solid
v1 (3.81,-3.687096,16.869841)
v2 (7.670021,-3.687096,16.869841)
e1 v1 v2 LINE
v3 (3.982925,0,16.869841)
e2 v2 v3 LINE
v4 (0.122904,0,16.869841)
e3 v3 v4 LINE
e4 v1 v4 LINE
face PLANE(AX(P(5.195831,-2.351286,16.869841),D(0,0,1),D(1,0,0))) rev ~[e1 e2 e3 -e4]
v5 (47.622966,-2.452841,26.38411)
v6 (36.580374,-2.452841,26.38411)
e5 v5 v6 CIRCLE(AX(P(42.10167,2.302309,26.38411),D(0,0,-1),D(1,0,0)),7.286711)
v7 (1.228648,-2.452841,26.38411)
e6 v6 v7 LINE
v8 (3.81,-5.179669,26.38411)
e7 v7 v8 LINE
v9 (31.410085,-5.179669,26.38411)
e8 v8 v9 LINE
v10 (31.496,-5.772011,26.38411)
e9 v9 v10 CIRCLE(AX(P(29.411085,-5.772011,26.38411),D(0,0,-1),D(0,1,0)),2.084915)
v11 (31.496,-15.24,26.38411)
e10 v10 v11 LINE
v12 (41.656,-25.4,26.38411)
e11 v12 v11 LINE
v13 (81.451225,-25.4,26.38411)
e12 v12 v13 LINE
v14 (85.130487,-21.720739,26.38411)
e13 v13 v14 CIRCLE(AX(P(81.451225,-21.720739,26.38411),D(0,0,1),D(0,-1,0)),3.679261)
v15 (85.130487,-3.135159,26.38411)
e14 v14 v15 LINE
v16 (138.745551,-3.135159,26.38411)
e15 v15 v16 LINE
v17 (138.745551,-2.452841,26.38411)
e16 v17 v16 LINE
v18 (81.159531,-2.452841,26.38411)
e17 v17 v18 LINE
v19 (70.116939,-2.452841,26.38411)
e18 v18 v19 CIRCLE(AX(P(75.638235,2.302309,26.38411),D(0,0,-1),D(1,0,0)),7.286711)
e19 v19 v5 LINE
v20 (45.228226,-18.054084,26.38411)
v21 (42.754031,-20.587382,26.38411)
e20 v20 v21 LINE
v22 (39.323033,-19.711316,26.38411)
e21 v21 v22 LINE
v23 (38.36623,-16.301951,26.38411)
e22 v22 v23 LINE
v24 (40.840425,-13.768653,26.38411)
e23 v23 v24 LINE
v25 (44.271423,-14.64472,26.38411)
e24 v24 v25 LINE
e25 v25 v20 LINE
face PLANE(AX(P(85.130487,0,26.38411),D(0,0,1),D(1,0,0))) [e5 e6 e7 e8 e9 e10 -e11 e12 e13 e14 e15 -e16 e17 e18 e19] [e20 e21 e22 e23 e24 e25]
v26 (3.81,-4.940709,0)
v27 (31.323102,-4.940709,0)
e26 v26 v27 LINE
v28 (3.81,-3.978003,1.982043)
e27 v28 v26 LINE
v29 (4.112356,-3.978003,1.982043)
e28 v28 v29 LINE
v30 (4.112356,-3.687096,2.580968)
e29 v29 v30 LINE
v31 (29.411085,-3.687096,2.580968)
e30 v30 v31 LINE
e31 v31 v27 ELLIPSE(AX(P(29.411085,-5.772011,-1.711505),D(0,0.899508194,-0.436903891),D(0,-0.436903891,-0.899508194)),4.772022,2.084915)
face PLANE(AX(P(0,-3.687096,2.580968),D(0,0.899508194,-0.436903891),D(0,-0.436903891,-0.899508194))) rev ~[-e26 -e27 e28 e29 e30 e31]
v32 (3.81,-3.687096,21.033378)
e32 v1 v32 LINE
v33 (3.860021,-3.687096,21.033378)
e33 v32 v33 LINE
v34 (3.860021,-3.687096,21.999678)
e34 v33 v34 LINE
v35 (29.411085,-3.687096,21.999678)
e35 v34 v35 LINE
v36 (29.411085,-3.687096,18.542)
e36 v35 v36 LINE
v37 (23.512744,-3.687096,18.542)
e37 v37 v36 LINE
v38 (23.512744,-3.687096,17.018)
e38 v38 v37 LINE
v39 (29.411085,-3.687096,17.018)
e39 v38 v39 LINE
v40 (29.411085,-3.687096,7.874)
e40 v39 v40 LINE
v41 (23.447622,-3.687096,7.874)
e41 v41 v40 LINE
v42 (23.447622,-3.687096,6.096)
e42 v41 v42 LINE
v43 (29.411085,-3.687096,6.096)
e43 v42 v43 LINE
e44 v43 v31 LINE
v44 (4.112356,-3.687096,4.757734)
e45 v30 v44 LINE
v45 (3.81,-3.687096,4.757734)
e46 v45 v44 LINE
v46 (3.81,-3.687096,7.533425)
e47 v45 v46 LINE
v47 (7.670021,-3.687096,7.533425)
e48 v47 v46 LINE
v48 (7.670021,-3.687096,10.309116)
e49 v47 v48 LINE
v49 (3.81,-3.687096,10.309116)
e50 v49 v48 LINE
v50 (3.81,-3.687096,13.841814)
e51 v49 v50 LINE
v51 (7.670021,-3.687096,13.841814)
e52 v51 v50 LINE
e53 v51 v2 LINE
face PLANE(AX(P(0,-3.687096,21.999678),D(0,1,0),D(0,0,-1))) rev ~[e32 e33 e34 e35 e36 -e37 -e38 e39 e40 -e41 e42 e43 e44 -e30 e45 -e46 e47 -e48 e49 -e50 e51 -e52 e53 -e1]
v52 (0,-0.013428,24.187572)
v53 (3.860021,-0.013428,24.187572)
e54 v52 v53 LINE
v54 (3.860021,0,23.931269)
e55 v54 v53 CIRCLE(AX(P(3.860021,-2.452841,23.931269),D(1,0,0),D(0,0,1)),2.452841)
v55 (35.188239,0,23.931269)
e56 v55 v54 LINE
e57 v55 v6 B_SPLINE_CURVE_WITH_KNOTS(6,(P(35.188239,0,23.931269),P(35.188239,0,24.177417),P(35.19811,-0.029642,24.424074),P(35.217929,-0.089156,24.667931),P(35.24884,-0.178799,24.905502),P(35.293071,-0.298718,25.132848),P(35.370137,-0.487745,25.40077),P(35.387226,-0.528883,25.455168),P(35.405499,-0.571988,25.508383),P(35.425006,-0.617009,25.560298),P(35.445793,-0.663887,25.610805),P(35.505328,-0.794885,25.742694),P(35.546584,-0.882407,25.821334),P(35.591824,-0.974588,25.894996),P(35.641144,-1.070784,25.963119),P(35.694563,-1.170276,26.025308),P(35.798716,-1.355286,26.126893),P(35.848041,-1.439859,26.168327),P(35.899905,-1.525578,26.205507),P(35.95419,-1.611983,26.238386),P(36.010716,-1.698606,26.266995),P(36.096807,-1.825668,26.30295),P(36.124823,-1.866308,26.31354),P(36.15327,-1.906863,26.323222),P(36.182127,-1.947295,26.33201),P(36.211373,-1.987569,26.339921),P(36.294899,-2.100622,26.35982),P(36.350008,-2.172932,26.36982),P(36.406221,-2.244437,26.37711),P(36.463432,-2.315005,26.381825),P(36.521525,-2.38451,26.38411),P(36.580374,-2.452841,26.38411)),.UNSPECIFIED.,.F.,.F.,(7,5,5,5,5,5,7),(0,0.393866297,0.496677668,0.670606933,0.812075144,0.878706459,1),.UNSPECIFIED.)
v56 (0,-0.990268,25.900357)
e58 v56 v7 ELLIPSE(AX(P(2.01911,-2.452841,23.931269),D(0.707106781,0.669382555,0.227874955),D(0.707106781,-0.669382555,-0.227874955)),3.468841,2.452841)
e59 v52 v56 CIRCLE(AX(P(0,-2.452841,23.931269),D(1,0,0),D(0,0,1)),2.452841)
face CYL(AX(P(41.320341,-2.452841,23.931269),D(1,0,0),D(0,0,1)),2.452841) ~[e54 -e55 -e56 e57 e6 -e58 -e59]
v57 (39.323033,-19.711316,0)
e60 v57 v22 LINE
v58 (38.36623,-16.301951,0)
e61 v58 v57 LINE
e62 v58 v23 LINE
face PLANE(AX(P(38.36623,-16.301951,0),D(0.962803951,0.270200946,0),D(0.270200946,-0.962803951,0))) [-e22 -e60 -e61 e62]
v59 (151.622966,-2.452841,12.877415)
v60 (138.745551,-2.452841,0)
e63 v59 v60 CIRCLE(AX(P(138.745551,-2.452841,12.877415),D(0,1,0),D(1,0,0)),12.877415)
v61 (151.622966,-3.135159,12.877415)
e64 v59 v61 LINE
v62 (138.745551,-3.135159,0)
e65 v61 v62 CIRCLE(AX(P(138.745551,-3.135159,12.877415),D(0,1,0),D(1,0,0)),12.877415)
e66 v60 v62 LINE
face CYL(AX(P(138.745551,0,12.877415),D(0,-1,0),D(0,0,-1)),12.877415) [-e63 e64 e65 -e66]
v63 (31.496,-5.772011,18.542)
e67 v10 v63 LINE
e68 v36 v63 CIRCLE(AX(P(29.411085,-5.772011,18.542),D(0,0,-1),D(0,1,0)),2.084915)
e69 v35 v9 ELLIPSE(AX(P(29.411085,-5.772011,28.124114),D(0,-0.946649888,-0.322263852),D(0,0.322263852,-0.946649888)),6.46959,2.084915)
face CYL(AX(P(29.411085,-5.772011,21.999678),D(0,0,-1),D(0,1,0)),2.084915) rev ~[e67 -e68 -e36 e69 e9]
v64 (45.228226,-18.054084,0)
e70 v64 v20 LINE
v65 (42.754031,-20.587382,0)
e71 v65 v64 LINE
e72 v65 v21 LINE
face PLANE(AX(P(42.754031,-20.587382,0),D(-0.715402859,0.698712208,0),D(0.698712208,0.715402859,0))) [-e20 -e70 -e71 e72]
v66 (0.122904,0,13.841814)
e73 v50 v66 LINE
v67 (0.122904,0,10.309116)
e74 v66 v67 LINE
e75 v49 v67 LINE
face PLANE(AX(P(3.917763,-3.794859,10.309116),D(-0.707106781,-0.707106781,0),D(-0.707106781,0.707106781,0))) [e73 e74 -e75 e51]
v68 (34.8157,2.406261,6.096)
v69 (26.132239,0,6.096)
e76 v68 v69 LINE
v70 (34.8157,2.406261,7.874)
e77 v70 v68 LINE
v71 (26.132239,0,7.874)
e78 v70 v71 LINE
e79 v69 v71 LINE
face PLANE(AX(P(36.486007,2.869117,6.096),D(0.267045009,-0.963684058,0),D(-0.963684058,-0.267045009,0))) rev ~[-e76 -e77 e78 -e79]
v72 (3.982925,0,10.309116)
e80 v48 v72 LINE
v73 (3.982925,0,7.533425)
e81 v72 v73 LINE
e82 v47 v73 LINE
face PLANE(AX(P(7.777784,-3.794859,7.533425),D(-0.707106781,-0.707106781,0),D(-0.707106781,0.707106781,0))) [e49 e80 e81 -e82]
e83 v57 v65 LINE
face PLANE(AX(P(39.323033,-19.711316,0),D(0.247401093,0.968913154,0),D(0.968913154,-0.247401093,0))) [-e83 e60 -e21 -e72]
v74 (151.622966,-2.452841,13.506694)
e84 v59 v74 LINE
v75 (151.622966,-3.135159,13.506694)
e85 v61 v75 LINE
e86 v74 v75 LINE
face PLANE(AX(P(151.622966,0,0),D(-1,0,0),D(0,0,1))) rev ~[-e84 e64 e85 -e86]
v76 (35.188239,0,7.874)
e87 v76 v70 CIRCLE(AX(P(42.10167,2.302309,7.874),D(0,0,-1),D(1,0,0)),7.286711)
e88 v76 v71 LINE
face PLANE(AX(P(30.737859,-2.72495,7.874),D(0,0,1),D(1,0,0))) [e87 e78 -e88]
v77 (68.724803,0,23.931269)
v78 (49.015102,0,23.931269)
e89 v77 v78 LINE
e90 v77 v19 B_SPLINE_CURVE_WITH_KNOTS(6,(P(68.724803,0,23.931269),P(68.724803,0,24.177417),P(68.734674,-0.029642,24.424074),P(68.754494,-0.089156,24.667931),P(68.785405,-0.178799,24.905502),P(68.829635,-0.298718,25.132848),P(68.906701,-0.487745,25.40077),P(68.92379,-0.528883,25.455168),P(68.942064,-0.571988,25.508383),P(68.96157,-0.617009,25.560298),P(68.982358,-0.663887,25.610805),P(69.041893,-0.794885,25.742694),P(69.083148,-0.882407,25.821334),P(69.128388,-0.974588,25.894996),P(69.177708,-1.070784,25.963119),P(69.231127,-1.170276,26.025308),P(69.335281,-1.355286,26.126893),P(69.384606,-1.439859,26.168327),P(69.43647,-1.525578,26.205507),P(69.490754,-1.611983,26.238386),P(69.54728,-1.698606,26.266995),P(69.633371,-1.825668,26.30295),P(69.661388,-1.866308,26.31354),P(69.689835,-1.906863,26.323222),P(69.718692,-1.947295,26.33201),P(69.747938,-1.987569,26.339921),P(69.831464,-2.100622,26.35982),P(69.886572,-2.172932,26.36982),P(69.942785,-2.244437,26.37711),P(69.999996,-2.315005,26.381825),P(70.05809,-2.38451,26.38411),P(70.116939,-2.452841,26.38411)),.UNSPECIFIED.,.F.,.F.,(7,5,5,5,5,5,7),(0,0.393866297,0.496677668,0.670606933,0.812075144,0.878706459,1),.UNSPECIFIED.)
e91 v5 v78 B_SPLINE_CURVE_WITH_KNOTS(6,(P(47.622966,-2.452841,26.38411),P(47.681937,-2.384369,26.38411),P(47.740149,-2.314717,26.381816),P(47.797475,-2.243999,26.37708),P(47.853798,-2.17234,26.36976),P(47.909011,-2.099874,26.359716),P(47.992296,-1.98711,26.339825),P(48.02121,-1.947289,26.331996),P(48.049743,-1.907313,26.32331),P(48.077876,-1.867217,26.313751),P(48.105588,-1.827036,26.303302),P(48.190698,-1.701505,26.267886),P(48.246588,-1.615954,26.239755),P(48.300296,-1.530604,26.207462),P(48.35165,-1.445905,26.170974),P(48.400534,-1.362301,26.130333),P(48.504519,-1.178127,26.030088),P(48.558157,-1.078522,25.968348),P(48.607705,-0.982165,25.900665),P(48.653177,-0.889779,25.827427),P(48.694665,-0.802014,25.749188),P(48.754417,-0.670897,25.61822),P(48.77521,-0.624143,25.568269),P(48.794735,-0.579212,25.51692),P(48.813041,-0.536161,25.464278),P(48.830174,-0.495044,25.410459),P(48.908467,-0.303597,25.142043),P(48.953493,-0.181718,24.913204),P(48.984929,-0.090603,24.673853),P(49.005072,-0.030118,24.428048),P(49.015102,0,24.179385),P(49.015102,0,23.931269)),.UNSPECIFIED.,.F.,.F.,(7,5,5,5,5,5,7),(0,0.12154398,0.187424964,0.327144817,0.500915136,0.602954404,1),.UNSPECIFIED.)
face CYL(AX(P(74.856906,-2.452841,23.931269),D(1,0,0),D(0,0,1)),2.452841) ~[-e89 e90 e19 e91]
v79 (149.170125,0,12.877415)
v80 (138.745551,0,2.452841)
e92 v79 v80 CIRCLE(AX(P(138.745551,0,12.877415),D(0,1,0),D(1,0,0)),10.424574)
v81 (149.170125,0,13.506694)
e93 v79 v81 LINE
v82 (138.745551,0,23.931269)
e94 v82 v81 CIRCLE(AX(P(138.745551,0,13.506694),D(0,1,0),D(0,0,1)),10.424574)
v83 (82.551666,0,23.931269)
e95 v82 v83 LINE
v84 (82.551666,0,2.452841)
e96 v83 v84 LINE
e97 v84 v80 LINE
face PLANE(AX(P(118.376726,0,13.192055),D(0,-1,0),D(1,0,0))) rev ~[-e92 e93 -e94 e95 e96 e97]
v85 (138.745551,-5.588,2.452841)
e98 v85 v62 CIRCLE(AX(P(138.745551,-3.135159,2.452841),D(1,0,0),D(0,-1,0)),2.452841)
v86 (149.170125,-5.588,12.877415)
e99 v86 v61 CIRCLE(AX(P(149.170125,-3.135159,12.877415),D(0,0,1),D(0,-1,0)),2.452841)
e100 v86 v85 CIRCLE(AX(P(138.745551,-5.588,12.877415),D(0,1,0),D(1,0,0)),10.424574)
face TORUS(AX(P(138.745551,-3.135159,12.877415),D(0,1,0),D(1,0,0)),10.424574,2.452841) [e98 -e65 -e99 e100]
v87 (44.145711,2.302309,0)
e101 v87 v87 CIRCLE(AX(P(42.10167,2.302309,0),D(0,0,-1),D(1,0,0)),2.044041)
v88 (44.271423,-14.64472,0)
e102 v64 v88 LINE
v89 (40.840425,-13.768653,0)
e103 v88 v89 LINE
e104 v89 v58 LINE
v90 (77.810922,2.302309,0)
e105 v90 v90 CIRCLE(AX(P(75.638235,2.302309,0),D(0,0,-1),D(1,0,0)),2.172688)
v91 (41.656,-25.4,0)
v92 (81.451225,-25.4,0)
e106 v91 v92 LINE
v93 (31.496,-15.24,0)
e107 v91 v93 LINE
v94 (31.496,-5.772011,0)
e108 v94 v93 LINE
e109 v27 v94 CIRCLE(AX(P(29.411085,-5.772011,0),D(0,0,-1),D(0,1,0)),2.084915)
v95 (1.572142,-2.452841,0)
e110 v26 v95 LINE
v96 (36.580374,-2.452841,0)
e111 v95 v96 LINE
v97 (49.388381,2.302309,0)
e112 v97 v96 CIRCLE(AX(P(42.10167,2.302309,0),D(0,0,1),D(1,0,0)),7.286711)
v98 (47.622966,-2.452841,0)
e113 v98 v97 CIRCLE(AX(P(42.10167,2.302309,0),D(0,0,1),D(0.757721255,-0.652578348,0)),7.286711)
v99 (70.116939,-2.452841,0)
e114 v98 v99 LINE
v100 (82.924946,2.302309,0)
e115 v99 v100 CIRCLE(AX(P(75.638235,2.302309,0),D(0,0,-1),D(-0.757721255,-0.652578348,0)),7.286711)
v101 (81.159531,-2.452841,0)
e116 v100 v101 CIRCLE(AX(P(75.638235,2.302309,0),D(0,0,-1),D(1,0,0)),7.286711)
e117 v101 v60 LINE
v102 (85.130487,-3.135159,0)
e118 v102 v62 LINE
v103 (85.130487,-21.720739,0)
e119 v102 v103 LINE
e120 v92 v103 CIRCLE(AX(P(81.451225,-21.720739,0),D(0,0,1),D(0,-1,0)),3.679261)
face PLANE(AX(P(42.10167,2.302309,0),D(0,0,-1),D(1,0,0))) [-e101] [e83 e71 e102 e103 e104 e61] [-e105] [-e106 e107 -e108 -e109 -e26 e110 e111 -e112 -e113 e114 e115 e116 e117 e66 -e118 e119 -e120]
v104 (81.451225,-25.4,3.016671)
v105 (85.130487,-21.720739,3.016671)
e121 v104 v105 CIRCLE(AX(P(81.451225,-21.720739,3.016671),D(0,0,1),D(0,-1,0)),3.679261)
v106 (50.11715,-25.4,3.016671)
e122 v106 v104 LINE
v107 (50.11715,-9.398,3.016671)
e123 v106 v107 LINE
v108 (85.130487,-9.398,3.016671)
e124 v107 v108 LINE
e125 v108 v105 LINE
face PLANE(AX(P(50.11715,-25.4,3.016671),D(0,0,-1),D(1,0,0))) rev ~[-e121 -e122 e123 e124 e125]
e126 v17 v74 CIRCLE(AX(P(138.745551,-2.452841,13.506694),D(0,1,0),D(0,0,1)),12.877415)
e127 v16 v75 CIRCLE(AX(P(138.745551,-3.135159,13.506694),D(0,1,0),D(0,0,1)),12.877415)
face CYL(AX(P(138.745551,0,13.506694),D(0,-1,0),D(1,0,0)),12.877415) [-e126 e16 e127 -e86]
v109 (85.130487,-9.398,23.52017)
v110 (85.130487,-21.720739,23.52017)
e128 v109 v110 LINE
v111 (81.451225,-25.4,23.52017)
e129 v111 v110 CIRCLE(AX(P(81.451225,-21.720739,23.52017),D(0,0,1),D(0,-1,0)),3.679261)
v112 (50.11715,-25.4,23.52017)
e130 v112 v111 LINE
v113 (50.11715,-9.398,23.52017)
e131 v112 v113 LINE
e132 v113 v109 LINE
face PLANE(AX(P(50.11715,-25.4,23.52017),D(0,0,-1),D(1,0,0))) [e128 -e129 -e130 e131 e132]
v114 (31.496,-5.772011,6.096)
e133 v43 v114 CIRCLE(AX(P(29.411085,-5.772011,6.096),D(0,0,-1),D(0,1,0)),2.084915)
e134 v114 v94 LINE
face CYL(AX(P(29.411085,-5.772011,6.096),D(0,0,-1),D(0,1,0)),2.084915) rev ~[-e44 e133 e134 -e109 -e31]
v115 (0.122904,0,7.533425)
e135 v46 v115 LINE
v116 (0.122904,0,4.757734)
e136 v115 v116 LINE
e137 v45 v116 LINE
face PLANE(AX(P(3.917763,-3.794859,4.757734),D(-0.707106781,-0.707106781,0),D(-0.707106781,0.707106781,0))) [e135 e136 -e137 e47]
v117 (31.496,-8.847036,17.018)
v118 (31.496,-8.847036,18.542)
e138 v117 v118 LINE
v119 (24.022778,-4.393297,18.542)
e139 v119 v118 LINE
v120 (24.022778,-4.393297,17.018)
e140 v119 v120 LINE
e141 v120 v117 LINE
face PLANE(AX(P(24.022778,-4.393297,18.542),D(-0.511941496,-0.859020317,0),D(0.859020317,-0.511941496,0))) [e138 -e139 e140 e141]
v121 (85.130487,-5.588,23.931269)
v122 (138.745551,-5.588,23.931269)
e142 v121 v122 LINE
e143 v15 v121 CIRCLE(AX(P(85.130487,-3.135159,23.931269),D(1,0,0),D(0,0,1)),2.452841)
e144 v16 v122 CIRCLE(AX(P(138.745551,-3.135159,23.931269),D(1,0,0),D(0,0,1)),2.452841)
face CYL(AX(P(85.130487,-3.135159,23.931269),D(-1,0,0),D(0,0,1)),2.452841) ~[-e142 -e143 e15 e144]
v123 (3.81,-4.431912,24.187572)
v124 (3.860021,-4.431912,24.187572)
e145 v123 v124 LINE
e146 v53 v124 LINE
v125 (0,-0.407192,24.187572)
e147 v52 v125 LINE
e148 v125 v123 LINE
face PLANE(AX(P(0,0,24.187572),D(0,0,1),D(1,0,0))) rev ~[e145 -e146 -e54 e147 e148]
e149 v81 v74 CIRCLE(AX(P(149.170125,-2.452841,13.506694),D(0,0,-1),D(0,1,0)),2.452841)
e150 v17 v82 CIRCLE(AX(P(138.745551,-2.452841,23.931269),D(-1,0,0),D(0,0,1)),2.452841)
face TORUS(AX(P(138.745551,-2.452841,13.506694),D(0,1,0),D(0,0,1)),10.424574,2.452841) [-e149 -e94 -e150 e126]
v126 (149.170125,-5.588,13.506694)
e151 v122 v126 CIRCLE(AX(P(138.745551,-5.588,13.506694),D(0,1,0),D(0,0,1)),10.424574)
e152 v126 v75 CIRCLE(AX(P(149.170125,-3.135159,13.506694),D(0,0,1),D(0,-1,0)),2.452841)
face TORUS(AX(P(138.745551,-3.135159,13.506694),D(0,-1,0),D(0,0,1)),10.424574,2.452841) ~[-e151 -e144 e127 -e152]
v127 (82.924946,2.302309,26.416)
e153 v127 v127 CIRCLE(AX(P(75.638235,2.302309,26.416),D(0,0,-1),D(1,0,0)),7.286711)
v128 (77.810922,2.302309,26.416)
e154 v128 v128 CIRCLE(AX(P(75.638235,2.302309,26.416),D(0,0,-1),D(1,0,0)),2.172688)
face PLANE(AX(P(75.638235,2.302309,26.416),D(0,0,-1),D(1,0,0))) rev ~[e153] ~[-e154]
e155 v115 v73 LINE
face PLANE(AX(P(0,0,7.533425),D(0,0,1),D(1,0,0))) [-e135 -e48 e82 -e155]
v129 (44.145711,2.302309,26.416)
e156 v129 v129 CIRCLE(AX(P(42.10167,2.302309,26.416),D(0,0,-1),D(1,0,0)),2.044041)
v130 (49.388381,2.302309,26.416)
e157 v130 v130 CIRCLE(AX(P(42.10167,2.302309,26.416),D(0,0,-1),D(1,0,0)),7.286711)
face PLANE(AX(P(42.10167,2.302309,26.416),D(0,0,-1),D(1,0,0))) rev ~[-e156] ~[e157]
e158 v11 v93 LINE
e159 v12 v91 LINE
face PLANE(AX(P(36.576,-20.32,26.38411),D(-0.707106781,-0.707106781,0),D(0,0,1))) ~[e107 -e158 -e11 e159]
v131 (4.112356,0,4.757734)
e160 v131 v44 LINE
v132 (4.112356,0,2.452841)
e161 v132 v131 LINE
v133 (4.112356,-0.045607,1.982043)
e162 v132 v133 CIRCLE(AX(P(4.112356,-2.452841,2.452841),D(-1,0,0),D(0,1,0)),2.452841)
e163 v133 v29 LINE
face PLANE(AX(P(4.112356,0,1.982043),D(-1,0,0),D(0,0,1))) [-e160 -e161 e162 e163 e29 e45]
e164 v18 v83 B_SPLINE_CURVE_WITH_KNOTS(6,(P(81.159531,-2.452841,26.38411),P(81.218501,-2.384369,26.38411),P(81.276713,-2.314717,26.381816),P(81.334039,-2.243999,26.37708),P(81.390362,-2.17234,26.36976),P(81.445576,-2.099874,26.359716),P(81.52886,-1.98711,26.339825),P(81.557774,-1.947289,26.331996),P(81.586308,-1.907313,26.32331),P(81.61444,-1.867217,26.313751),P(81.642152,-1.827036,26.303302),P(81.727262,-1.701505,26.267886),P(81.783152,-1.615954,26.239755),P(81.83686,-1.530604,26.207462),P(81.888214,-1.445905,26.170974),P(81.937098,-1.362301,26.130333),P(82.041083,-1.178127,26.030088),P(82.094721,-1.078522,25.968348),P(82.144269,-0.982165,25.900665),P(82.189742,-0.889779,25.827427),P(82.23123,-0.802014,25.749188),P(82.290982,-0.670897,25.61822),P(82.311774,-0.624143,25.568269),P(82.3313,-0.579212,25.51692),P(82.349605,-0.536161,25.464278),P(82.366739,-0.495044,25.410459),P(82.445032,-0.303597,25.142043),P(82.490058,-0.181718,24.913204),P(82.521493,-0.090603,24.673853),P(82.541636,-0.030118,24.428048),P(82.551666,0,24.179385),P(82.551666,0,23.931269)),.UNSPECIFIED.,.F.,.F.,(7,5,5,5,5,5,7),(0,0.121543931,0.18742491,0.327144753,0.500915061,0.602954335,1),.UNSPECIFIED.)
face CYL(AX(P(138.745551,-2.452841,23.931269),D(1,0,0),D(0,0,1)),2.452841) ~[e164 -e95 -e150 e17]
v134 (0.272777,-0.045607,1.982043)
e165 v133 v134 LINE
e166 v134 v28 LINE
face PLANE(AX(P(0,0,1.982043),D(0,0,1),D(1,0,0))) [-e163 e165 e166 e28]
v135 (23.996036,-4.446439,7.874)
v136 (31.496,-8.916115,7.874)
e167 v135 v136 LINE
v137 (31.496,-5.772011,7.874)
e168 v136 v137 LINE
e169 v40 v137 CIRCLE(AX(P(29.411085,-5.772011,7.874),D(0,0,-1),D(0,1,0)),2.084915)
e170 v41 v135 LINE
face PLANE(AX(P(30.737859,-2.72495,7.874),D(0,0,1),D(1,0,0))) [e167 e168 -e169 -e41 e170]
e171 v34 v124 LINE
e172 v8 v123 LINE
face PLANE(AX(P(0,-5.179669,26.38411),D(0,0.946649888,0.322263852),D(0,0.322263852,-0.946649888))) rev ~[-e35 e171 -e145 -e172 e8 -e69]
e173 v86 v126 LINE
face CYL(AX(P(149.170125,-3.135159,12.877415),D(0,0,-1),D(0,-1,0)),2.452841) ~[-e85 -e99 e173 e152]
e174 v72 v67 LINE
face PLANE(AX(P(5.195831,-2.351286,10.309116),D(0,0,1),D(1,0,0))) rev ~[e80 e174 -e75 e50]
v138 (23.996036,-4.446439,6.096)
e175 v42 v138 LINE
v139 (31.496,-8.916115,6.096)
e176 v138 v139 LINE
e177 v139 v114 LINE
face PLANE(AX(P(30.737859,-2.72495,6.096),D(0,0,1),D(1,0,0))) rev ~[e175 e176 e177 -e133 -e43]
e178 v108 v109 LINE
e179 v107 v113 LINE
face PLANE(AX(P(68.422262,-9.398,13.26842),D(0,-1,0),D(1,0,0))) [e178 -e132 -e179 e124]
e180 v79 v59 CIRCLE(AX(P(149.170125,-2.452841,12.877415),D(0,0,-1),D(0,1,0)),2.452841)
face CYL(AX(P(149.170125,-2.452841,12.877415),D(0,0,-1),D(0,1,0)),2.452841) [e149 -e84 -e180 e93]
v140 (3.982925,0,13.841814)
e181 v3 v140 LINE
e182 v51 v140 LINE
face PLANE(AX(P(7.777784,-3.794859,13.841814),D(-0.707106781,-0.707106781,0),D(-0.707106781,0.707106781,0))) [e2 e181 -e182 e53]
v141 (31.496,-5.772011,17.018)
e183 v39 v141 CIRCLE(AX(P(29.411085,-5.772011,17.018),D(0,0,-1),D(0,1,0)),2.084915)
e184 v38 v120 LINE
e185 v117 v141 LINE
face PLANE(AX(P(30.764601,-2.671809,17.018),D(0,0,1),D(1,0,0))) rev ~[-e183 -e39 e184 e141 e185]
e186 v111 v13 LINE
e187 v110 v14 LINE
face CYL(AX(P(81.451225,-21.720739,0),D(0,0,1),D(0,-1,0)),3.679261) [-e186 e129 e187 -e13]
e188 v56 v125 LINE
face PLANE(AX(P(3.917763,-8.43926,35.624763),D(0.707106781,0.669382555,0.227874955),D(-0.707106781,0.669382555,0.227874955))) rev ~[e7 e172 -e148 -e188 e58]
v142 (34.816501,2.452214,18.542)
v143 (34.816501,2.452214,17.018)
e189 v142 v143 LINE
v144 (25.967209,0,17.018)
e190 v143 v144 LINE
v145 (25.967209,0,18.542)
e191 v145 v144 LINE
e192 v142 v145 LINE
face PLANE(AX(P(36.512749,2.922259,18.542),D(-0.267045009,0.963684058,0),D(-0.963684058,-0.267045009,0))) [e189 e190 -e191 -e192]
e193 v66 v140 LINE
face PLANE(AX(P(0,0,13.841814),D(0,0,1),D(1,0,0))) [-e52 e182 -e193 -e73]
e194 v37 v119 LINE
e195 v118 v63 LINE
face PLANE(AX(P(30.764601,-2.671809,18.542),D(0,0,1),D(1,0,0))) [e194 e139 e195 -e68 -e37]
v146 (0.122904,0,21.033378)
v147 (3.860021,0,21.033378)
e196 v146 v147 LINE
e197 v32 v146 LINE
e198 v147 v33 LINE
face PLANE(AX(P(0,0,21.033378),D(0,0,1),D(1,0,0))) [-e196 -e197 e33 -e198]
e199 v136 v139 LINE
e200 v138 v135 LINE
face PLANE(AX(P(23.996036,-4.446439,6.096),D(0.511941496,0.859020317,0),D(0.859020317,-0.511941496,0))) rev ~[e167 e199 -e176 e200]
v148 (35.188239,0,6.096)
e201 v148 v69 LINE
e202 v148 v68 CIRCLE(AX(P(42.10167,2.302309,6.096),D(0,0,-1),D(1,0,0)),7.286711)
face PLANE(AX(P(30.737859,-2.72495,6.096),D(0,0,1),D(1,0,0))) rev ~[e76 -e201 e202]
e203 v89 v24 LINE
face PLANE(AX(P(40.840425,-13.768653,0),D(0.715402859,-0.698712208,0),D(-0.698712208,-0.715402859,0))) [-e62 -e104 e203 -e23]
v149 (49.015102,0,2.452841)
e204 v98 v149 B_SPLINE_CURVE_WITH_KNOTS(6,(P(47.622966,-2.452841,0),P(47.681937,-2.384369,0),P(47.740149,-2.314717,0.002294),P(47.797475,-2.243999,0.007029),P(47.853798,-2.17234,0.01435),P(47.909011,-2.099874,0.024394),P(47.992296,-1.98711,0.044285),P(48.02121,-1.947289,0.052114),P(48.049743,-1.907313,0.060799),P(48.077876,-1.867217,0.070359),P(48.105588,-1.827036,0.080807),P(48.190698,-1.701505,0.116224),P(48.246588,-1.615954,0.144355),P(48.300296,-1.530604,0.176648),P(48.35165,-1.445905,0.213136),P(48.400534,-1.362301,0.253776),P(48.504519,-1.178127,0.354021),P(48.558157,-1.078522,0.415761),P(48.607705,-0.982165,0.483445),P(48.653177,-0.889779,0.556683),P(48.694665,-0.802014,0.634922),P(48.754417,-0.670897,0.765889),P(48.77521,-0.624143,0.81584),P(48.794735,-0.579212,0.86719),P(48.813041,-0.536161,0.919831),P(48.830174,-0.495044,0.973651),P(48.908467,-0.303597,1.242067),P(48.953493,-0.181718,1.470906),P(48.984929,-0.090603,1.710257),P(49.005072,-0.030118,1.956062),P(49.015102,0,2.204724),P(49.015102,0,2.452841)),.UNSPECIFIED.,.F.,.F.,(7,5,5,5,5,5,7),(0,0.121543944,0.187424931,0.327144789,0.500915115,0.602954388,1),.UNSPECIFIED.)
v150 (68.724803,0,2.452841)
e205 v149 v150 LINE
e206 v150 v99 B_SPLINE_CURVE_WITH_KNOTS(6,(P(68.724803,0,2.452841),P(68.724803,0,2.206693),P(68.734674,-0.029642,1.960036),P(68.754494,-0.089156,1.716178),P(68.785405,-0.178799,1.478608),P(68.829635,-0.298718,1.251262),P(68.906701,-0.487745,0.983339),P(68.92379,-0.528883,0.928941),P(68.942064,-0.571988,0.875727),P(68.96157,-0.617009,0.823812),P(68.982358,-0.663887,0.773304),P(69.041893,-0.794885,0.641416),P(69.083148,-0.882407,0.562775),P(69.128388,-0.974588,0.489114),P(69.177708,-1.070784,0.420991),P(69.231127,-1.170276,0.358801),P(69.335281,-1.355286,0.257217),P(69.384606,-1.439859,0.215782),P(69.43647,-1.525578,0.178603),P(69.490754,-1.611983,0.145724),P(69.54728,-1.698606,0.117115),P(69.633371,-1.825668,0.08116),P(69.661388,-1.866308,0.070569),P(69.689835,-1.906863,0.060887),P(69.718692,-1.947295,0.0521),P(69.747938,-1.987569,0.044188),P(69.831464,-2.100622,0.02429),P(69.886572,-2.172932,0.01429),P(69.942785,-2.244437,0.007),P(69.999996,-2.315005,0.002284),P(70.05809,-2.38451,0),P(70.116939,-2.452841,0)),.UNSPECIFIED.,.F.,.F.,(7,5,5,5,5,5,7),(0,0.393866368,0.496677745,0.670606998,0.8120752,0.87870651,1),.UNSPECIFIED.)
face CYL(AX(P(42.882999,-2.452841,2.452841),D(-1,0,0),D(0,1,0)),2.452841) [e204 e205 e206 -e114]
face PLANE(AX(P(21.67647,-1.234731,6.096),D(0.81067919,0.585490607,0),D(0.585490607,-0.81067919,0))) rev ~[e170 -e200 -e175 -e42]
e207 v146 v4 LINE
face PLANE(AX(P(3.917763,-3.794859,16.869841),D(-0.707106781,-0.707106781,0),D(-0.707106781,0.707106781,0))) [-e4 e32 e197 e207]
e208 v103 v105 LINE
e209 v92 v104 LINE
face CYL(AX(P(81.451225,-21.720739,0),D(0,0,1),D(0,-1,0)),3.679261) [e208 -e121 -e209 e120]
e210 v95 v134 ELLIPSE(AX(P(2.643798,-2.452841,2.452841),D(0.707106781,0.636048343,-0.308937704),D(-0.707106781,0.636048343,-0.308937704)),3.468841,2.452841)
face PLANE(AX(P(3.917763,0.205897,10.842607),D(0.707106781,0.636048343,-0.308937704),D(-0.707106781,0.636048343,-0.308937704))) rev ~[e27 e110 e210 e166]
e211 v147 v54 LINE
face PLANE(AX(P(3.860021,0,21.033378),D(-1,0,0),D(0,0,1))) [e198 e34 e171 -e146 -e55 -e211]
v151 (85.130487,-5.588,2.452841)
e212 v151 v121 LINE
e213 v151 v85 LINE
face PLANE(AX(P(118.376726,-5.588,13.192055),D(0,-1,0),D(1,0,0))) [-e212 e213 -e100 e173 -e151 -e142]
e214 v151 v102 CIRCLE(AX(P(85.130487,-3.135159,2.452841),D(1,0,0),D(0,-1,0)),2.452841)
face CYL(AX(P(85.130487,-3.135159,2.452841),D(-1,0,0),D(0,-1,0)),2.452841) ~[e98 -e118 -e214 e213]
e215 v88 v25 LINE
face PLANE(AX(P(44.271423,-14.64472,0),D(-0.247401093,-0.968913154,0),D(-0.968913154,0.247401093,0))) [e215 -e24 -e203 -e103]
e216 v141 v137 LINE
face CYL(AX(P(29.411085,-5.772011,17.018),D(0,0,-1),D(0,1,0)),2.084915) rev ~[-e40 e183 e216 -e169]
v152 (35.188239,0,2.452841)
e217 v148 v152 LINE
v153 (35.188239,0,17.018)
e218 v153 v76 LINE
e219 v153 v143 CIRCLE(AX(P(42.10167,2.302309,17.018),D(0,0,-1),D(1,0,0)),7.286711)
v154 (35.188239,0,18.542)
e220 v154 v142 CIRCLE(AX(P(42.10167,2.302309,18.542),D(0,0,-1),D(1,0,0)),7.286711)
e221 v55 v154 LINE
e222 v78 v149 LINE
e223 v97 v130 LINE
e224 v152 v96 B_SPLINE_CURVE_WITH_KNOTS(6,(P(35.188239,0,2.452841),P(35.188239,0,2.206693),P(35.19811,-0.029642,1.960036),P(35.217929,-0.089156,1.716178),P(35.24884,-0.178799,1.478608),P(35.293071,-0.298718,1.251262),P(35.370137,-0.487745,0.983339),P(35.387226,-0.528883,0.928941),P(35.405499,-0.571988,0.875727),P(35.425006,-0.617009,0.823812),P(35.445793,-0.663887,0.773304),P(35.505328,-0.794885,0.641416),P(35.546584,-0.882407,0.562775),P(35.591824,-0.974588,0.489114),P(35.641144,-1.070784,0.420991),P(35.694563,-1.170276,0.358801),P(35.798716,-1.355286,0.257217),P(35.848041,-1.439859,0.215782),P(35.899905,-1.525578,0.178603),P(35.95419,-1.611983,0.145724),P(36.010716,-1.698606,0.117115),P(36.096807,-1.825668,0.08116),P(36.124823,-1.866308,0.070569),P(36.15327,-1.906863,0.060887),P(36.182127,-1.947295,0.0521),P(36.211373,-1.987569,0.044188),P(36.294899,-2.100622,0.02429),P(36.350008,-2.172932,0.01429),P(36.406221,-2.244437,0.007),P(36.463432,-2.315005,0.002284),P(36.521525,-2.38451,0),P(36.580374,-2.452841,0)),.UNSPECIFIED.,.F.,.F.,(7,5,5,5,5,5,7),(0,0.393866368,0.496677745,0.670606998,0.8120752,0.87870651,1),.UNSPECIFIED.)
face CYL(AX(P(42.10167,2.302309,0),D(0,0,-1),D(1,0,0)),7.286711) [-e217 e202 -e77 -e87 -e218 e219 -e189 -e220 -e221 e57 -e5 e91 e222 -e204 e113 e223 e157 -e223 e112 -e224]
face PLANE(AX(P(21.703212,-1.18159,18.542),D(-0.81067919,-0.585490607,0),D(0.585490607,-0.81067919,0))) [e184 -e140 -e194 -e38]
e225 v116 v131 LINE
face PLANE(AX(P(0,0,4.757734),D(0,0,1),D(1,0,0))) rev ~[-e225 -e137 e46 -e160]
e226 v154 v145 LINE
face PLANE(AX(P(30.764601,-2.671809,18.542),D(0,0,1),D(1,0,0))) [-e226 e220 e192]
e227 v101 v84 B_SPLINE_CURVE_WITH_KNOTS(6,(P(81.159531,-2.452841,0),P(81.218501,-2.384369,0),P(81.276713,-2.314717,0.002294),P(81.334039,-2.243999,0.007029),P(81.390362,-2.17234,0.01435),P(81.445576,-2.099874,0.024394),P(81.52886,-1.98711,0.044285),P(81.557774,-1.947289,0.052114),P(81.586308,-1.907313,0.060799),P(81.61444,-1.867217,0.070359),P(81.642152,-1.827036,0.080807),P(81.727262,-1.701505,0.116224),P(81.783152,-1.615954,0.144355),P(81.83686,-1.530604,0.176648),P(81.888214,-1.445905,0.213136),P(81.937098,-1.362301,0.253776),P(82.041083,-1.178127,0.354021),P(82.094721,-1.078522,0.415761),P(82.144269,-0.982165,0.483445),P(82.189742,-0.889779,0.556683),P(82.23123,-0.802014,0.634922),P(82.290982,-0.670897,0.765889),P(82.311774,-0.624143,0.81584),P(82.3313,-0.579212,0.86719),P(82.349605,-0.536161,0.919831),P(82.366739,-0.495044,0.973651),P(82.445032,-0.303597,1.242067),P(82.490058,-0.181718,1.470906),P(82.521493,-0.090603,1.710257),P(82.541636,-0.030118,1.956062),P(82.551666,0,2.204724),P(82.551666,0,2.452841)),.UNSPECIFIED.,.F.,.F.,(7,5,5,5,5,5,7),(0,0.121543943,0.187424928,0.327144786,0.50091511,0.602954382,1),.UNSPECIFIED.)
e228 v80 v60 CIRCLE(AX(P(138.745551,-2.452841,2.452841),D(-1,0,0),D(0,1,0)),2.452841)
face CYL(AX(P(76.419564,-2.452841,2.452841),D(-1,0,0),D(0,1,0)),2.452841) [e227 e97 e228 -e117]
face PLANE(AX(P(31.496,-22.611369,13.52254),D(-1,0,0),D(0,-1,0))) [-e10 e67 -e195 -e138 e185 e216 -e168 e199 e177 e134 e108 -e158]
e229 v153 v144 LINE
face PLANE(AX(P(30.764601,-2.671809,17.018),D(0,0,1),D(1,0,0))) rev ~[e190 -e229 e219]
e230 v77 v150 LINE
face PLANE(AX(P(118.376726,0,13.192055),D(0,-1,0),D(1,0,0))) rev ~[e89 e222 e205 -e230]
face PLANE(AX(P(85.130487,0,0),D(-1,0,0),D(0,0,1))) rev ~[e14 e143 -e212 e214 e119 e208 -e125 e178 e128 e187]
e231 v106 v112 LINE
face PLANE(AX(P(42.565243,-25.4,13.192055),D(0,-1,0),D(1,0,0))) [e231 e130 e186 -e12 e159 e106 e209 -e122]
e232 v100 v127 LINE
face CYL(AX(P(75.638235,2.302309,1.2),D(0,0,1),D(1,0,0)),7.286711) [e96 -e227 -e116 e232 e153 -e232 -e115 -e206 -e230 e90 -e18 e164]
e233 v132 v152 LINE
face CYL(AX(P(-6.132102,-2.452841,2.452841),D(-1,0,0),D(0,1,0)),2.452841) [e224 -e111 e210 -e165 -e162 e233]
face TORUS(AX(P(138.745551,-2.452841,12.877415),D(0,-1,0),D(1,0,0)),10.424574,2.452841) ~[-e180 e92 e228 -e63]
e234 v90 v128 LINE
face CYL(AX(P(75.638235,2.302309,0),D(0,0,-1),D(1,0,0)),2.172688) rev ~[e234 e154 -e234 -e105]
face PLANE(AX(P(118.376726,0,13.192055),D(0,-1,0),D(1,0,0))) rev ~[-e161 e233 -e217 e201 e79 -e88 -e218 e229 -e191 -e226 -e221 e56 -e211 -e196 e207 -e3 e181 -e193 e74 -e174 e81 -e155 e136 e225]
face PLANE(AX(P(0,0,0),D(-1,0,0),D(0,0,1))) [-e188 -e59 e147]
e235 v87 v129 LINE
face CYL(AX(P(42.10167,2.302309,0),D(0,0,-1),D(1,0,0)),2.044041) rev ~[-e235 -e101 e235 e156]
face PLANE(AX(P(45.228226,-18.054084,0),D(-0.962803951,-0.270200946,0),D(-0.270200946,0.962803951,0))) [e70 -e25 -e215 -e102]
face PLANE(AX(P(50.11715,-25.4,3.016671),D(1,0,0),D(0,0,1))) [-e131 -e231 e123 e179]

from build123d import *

# Parameters (mm, degrees)
F0_W          = 85.1304866374
F0_H          = 26.3841096312
F1_DEPTH      = 25.4
F0_W_2        = 66.4924792945
F2_DEPTH      = 5.588
F4_DEPTH      = 31.496
F5_W          = 3.8600212429
F5_H          = 3.1541939825
F5_H_2        = 3.028026782
F5_H_3        = 2.775690984
F5_W_2        = 4.1123558767
F6_DEPTH      = 25.4
F8_DEPTH      = 28.702
F9_SIZE       = 10.16
F10_R         = 3.6792614691
F11_T1_DEPTH  = 4.1635371745
F11_T3_DEPTH  = 3.532698378
F11_T5_DEPTH  = 2.7756914496
F11_T7_DEPTH  = 3.028026782
F11_T9_DEPTH  = 2.775690984
F11_T14_DEPTH = 21.9165514071
F11_T20_DEPTH = 21.7996979777
F12_R         = 12.8774151417
F13_W         = 36.6102233529
F13_H         = 20.5034988467
F14_DEPTH     = 16.002
F15_R         = 7.2867112822
F15_R_2       = 2.0440412519
F15_R_3       = 2.1726876713
F16_DEPTH     = 26.416
F17_T1_DEPTH  = 53.6150641528
F17_T3_DEPTH  = 0.6292793478
F17_T8_DEPTH  = 62.3259871722
F17_S9_R      = 7.2867112822
F17_T10_DEPTH = 33
F17_T14_DEPTH = 31.9739065533
F17_S15_R     = 7.2867112822
F17_T16_DEPTH = 18
F17_S17_R     = 7.2867112822
F17_T18_DEPTH = 18
F17_T22_DEPTH = 47.4524435023
F17_S23_R     = 7.2867112822
F17_T24_DEPTH = 25
F17_T28_DEPTH = 31.9739065533
F17_S29_R     = 7.2867112822
F17_T30_DEPTH = 18
F17_S31_R     = 7.2867112822
F17_T32_DEPTH = 18
F17_T36_DEPTH = 47.4524435023
F17_S37_R     = 7.2867112822
F17_T38_DEPTH = 25
F17_T42_DEPTH = 62.3259871722
F17_S43_R     = 7.2867112822
F17_T44_DEPTH = 33
F17_T46_ANGLE = 90
F17_T48_ANGLE = 90
F17_T50_ANGLE = 90
F17_T52_ANGLE = 90
F21_DEPTH     = 1.778
F23_DEPTH     = 1.524
F24_R         = 2.0849148325


# Not quite as in the source:
# - a fillet or chamfer that OpenCascade refuses, or shapes differently, is made with other operations: its cross-section is extruded or revolved along the edge and cut away or added


with BuildPart() as f1:
    # F0 (on Front) → F1 (new body)
    with BuildSketch(Plane.XZ):
        with Locations((42.5652433187, 13.1920548156)):
            Rectangle(F0_W, F0_H)
    extrude(amount=F1_DEPTH)

    # F0 (on Front) → F2 (join)
    with BuildSketch(Plane.XZ):
        with Locations((118.3767262846, 13.1920548156)):
            Rectangle(F0_W_2, F0_H)
    extrude(amount=F2_DEPTH)

    # F3 (on face) → F4 (cut)
    with BuildSketch(Plane(origin=(0, 0, 0), x_dir=(0, -1, 0), z_dir=(-1, 0, 0))):
        Polygon((35.6419347227, 33.0609679222), (7.6199998148, 33.5525795817), (5.1796691639, 26.3841096312), (25.4, 26.3841096312), (25.4, 0), (4.9407089369, 0), (7.8658051789, -6.022258196), (35.6419347227, -6.022258196), align=None)
        Polygon((25.4, 26.3841096312), (5.1796691639, 26.3841096312), (3.687096294, 21.9996776432), (3.687096294, 2.5809677318), (4.9407089369, 0), (25.4, 0), align=None)
    extrude(amount=-F4_DEPTH, mode=Mode.SUBTRACT)

    # F5 (on Front) → F6 (cut)
    with BuildSketch(Plane.XZ):
        with Locations((1.9300106214, 22.6104753092)):
            Rectangle(F5_W, F5_H)
        with Locations((1.9300106214, 15.3558277525)):
            Rectangle(F5_W, F5_H_2)
        with Locations((1.9300106214, 8.9212704916)):
            Rectangle(F5_W, F5_H_3)
        with Locations((2.0561779384, 3.3698880579)):
            Rectangle(F5_W_2, F5_H_3)
    extrude(amount=F6_DEPTH, mode=Mode.SUBTRACT)

    # F7 (on Top) → F8 (cut)
    with BuildSketch(Plane.XY):
        Polygon((40.8404252998, -13.7686529255), (38.3662302699, -16.301950867), (39.3230331276, -19.7113155876), (42.7540310152, -20.5873823667), (45.2282260452, -18.0540844252), (44.2714231875, -14.6447197046), align=None)
    extrude(amount=F8_DEPTH, mode=Mode.SUBTRACT)

    # F9
    f9_edges = [f1.edges().sort_by_distance(p)[0] for p in [
        (31.496, -25.4, 13.192055),
    ]]
    chamfer(f9_edges, length=F9_SIZE)

    # F10
    f10_edges = [f1.edges().sort_by_distance(p)[0] for p in [
        (85.130487, -25.4, 13.192055),
    ]]
    fillet(f10_edges, radius=F10_R)

    # F11: chamfer of 3.81 on 7 edges, made by hand

    # F11_s2 → F11_t1 (cut)
    with BuildSketch(Plane.XY.offset(16.8698411435)):
        with BuildLine():
            Line((3.9177630735, -3.7948593675), (-0.1077630735, 0.2306667794))
            Line((-0.1077630735, 0.2306667794), (-0.1839630735, 0.2306667794))
            ThreePointArc((-0.1839630735, 0.2306667794), (-0.0762, -1.7282147573), (-0.0762, -3.687096294))
            Line((-0.0762, -3.687096294), (0, -3.763296294))
            ThreePointArc((0, -3.763296294), (1.9588815367, -3.763296294), (3.9177630735, -3.8710593675))
            Line((3.9177630735, -3.8710593675), (3.9177630735, -3.7948593675))
        make_face()
    extrude(amount=F11_T1_DEPTH, mode=Mode.SUBTRACT)

    # F11_s4 → F11_t3 (cut)
    with BuildSketch(Plane.XY.offset(10.3091159835)):
        with BuildLine():
            Line((3.9177630735, -3.7948593675), (-0.1077630735, 0.2306667794))
            Line((-0.1077630735, 0.2306667794), (-0.1839630735, 0.2306667794))
            ThreePointArc((-0.1839630735, 0.2306667794), (-0.0762, -1.7282147573), (-0.0762, -3.687096294))
            Line((-0.0762, -3.687096294), (0, -3.763296294))
            ThreePointArc((0, -3.763296294), (1.9588815367, -3.763296294), (3.9177630735, -3.8710593675))
            Line((3.9177630735, -3.8710593675), (3.9177630735, -3.7948593675))
        make_face()
    extrude(amount=F11_T3_DEPTH, mode=Mode.SUBTRACT)

    # F11_s6 → F11_t5 (cut)
    with BuildSketch(Plane.XY.offset(4.7577335499)):
        with BuildLine():
            Line((3.9177630735, -3.7948593675), (-0.1077630735, 0.2306667794))
            Line((-0.1077630735, 0.2306667794), (-0.1839630735, 0.2306667794))
            ThreePointArc((-0.1839630735, 0.2306667794), (-0.0762, -1.7282147573), (-0.0762, -3.687096294))
            Line((-0.0762, -3.687096294), (0, -3.763296294))
            ThreePointArc((0, -3.763296294), (1.9588815367, -3.763296294), (3.9177630735, -3.8710593675))
            Line((3.9177630735, -3.8710593675), (3.9177630735, -3.7948593675))
        make_face()
    extrude(amount=F11_T5_DEPTH, mode=Mode.SUBTRACT)

    # F11_s8 → F11_t7 (cut)
    with BuildSketch(Plane.XY.offset(13.8418143615)):
        with BuildLine():
            Line((7.7777843163, -3.7948593675), (3.7522581694, 0.2306667794))
            Line((3.7522581694, 0.2306667794), (3.6760581694, 0.2306667794))
            ThreePointArc((3.6760581694, 0.2306667794), (3.7838212429, -1.7282147573), (3.7838212429, -3.687096294))
            Line((3.7838212429, -3.687096294), (3.8600212429, -3.763296294))
            ThreePointArc((3.8600212429, -3.763296294), (5.8189027796, -3.763296294), (7.7777843163, -3.8710593675))
            Line((7.7777843163, -3.8710593675), (7.7777843163, -3.7948593675))
        make_face()
    extrude(amount=F11_T7_DEPTH, mode=Mode.SUBTRACT)

    # F11_s10 → F11_t9 (cut)
    with BuildSketch(Plane.XY.offset(7.5334249996)):
        with BuildLine():
            Line((7.7777843163, -3.7948593675), (3.7522581694, 0.2306667794))
            Line((3.7522581694, 0.2306667794), (3.6760581694, 0.2306667794))
            ThreePointArc((3.6760581694, 0.2306667794), (3.7838212429, -1.7282147573), (3.7838212429, -3.687096294))
            Line((3.7838212429, -3.687096294), (3.8600212429, -3.763296294))
            ThreePointArc((3.8600212429, -3.763296294), (5.8189027796, -3.763296294), (7.7777843163, -3.8710593675))
            Line((7.7777843163, -3.8710593675), (7.7777843163, -3.7948593675))
        make_face()
    extrude(amount=F11_T9_DEPTH, mode=Mode.SUBTRACT)


with BuildPart() as f11_tool12:
    # F11_s13 → F11_t14 (new body)
    with BuildSketch(Plane(origin=(0, -11.7445344188, 34.4995634238), x_dir=(1, 0, 0), z_dir=(0, 0.3222638516, -0.9466498877))):
        with BuildLine():
            Line((3.9177630735, -3.491548486), (-0.1077630735, -7.5170746329))
            Line((-0.1077630735, -7.5170746329), (-0.1839630735, -7.5170746329))
            ThreePointArc((-0.1839630735, -7.5170746329), (-0.0762, -5.5581930961), (-0.0762, -3.5993115594))
            Line((-0.0762, -3.5993115594), (0, -3.5231115594))
            ThreePointArc((0, -3.5231115594), (1.9588815367, -3.5231115594), (3.9177630735, -3.415348486))
            Line((3.9177630735, -3.415348486), (3.9177630735, -3.491548486))
        make_face()
    extrude(amount=F11_T14_DEPTH)

    split(bisect_by=Plane.XY.offset(26.3841096312), keep=Keep.BOTTOM)

    split(bisect_by=Plane.XY.offset(24.1875723004), keep=Keep.TOP)


with BuildPart() as f1_1:
    add(f1.part)

    # F11_t11: cut F11_tool12
    add(f11_tool12.part, mode=Mode.SUBTRACT)


with BuildPart() as f11_tool18:
    # F11_s19 → F11_t20 (new body)
    with BuildSketch(Plane(origin=(0, 4.3004322544, 8.8538329162), x_dir=(1, 0, 0), z_dir=(0, -0.4369038907, -0.8995081936))):
        with BuildLine():
            Line((3.9177630735, 4.5519712442), (-0.1077630735, 0.5264450973))
            Line((-0.1077630735, 0.5264450973), (-0.1839630735, 0.5264450973))
            ThreePointArc((-0.1839630735, 0.5264450973), (-0.0762, 2.485326634), (-0.0762, 4.4442081707))
            Line((-0.0762, 4.4442081707), (0, 4.5204081707))
            ThreePointArc((0, 4.5204081707), (1.9588815367, 4.5204081707), (3.9177630735, 4.6281712442))
            Line((3.9177630735, 4.6281712442), (3.9177630735, 4.5519712442))
        make_face()
    extrude(amount=F11_T20_DEPTH)

    split(bisect_by=Plane.XY.offset(1.9820425659), keep=Keep.BOTTOM)


with BuildPart() as f1_2:
    add(f1_1.part)

    # F11_t17: cut F11_tool18
    add(f11_tool18.part, mode=Mode.SUBTRACT)

    # F12
    f12_edges = [f1_2.edges().sort_by_distance(p)[0] for p in [
        (151.622966, -2.794, 0),
        (151.622966, -2.794, 26.38411),
    ]]
    fillet(f12_edges, radius=F12_R)

    # F13 (on face) → F14 (cut)
    with BuildSketch(Plane.XZ.offset(25.4)):
        with Locations((68.4222616255, 13.2684203563)):
            Rectangle(F13_W, F13_H)
    extrude(amount=-F14_DEPTH, mode=Mode.SUBTRACT)

    # F15 (on face) → F16 (join)
    with BuildSketch(Plane(origin=(0, 0, 0), x_dir=(1, 0, 0), z_dir=(0, 0, -1))):
        with Locations((42.1016700566, -2.3023090325)):
            Circle(F15_R)
        with Locations((42.1016700566, -2.3023090325)):
            Circle(F15_R_2, mode=Mode.SUBTRACT)
        with Locations((75.6382346153, -2.3023090325)):
            Circle(F15_R)
        with Locations((75.6382346153, -2.3023090325)):
            Circle(F15_R_3, mode=Mode.SUBTRACT)
    extrude(amount=-F16_DEPTH)

    # F17: fillet of radius 2.4528409794 on 14 edges, made by hand

    # F17_s2 → F17_t1 (cut)
    with BuildSketch(Plane.YZ.offset(85.1304866374)):
        with BuildLine():
            ThreePointArc((-5.588, 2.4528409794), (-4.8695795103, 0.7184204897), (-3.1351590206, 0))
            Line((-3.1351590206, 0), (-5.588, 0))
            Line((-5.588, 0), (-5.588, 2.4528409794))
        make_face()
        with BuildLine():
            ThreePointArc((-3.1351590206, 26.3841096312), (-4.8695795103, 25.6656891415), (-5.588, 23.9312686518))
            Line((-5.588, 23.9312686518), (-5.588, 26.3841096312))
            Line((-5.588, 26.3841096312), (-3.1351590206, 26.3841096312))
        make_face()
    extrude(amount=F17_T1_DEPTH, mode=Mode.SUBTRACT)

    # F17_s4 → F17_t3 (cut)
    with BuildSketch(Plane.XY.offset(12.8774151417)):
        with BuildLine():
            ThreePointArc((149.1701249525, 0), (150.9045454422, -0.7184204897), (151.6229659319, -2.4528409794))
            Line((151.6229659319, -2.4528409794), (151.6229659319, 0))
            Line((151.6229659319, 0), (149.1701249525, 0))
        make_face()
        with BuildLine():
            ThreePointArc((149.1701249525, -5.588), (150.9045454422, -4.8695795103), (151.6229659319, -3.1351590206))
            Line((151.6229659319, -3.1351590206), (151.6229659319, -5.588))
            Line((151.6229659319, -5.588), (149.1701249525, -5.588))
        make_face()
    extrude(amount=F17_T3_DEPTH, mode=Mode.SUBTRACT)


with BuildPart() as f17_tool6:
    # F17_s7 → F17_t8 (new body)
    with BuildSketch(Plane.YZ.offset(76.419563618)):
        with BuildLine():
            ThreePointArc((0, 2.4528409794), (-0.7184204897, 0.7184204897), (-2.4528409794, 0))
            Line((-2.4528409794, 0), (0, 0))
            Line((0, 0), (0, 2.4528409794))
        make_face()
    extrude(amount=F17_T8_DEPTH)

    # F17_s9 → F17_t10 (cut, symmetric)
    with BuildSketch(Plane.XY.offset(1.2)):
        with Locations((75.6382346153, 2.3023090325)):
            Circle(F17_S9_R)
    extrude(amount=F17_T10_DEPTH, both=True, mode=Mode.SUBTRACT)


with BuildPart() as f1_3:
    add(f1_2.part)

    # F17_t5: cut F17_tool6
    add(f17_tool6.part, mode=Mode.SUBTRACT)


with BuildPart() as f17_tool12:
    # F17_s13 → F17_t14 (new body)
    with BuildSketch(Plane.YZ.offset(42.8829990593)):
        with BuildLine():
            ThreePointArc((0, 2.4528409794), (-0.7184204897, 0.7184204897), (-2.4528409794, 0))
            Line((-2.4528409794, 0), (0, 0))
            Line((0, 0), (0, 2.4528409794))
        make_face()
    extrude(amount=F17_T14_DEPTH)

    # F17_s15 → F17_t16 (cut, symmetric)
    with BuildSketch(Plane.XY.offset(1.2)):
        with Locations((75.6382346153, 2.3023090325)):
            Circle(F17_S15_R)
    extrude(amount=F17_T16_DEPTH, both=True, mode=Mode.SUBTRACT)

    # F17_s17 → F17_t18 (cut, symmetric)
    with BuildSketch(Plane.XY.offset(1.2)):
        with Locations((42.1016700566, 2.3023090325)):
            Circle(F17_S17_R)
    extrude(amount=F17_T18_DEPTH, both=True, mode=Mode.SUBTRACT)


with BuildPart() as f1_4:
    add(f1_3.part)

    # F17_t11: cut F17_tool12
    add(f17_tool12.part, mode=Mode.SUBTRACT)


with BuildPart() as f17_tool20:
    # F17_s21 → F17_t22 (new body)
    with BuildSketch(Plane.YZ.offset(-6.1321024484)):
        with BuildLine():
            ThreePointArc((0, 2.4528409794), (-0.7184204897, 0.7184204897), (-2.4528409794, 0))
            Line((-2.4528409794, 0), (0, 0))
            Line((0, 0), (0, 2.4528409794))
        make_face()
    extrude(amount=F17_T22_DEPTH)

    # F17_s23 → F17_t24 (cut, symmetric)
    with BuildSketch(Plane.XY.offset(1.2)):
        with Locations((42.1016700566, 2.3023090325)):
            Circle(F17_S23_R)
    extrude(amount=F17_T24_DEPTH, both=True, mode=Mode.SUBTRACT)


with BuildPart() as f1_5:
    add(f1_4.part)

    # F17_t19: cut F17_tool20
    add(f17_tool20.part, mode=Mode.SUBTRACT)


with BuildPart() as f17_tool26:
    # F17_s27 → F17_t28 (new body)
    with BuildSketch(Plane.YZ.offset(74.8569056126)):
        with BuildLine():
            ThreePointArc((-2.4528409794, 26.3841096312), (-0.7184204897, 25.6656891415), (0, 23.9312686518))
            Line((0, 23.9312686518), (0, 26.3841096312))
            Line((0, 26.3841096312), (-2.4528409794, 26.3841096312))
        make_face()
    extrude(amount=-F17_T28_DEPTH)

    # F17_s29 → F17_t30 (cut, symmetric)
    with BuildSketch(Plane.XY.offset(25.2)):
        with Locations((75.6382346153, 2.3023090325)):
            Circle(F17_S29_R)
    extrude(amount=F17_T30_DEPTH, both=True, mode=Mode.SUBTRACT)

    # F17_s31 → F17_t32 (cut, symmetric)
    with BuildSketch(Plane.XY.offset(25.2)):
        with Locations((42.1016700566, 2.3023090325)):
            Circle(F17_S31_R)
    extrude(amount=F17_T32_DEPTH, both=True, mode=Mode.SUBTRACT)


with BuildPart() as f1_6:
    add(f1_5.part)

    # F17_t25: cut F17_tool26
    add(f17_tool26.part, mode=Mode.SUBTRACT)


with BuildPart() as f17_tool34:
    # F17_s35 → F17_t36 (new body)
    with BuildSketch(Plane.YZ.offset(41.3203410539)):
        with BuildLine():
            ThreePointArc((-2.4528409794, 26.3841096312), (-0.7184204897, 25.6656891415), (0, 23.9312686518))
            Line((0, 23.9312686518), (0, 26.3841096312))
            Line((0, 26.3841096312), (-2.4528409794, 26.3841096312))
        make_face()
    extrude(amount=-F17_T36_DEPTH)

    # F17_s37 → F17_t38 (cut, symmetric)
    with BuildSketch(Plane.XY.offset(25.2)):
        with Locations((42.1016700566, 2.3023090325)):
            Circle(F17_S37_R)
    extrude(amount=F17_T38_DEPTH, both=True, mode=Mode.SUBTRACT)


with BuildPart() as f1_7:
    add(f1_6.part)

    # F17_t33: cut F17_tool34
    add(f17_tool34.part, mode=Mode.SUBTRACT)


with BuildPart() as f17_tool40:
    # F17_s41 → F17_t42 (new body)
    with BuildSketch(Plane.YZ.offset(138.7455507902)):
        with BuildLine():
            ThreePointArc((-2.4528409794, 26.3841096312), (-0.7184204897, 25.6656891415), (0, 23.9312686518))
            Line((0, 23.9312686518), (0, 26.3841096312))
            Line((0, 26.3841096312), (-2.4528409794, 26.3841096312))
        make_face()
    extrude(amount=-F17_T42_DEPTH)

    # F17_s43 → F17_t44 (cut, symmetric)
    with BuildSketch(Plane.XY.offset(25.2)):
        with Locations((75.6382346153, 2.3023090325)):
            Circle(F17_S43_R)
    extrude(amount=F17_T44_DEPTH, both=True, mode=Mode.SUBTRACT)


with BuildPart() as f1_8:
    add(f1_7.part)

    # F17_t39: cut F17_tool40
    add(f17_tool40.part, mode=Mode.SUBTRACT)

    # F17_s45 → F17_t46 (revolve, cut)
    with BuildSketch(Plane.YZ.offset(138.7455507902)):
        with BuildLine():
            ThreePointArc((-2.4528409794, 26.3841096312), (-0.7184204897, 25.6656891415), (0, 23.9312686518))
            Line((0, 23.9312686518), (0, 26.3841096312))
            Line((0, 26.3841096312), (-2.4528409794, 26.3841096312))
        make_face()
    revolve(axis=Axis((138.7455507902, 0, 13.5066944895), (0, 1, 0)), revolution_arc=F17_T46_ANGLE, mode=Mode.SUBTRACT)

    # F17_s47 → F17_t48 (revolve, cut)
    with BuildSketch(Plane.YZ.offset(138.7455507902)):
        with BuildLine():
            ThreePointArc((-3.1351590206, 26.3841096312), (-4.8695795103, 25.6656891415), (-5.588, 23.9312686518))
            Line((-5.588, 23.9312686518), (-5.588, 26.3841096312))
            Line((-5.588, 26.3841096312), (-3.1351590206, 26.3841096312))
        make_face()
    revolve(axis=Axis((138.7455507902, -5.588, 13.5066944895), (0, 1, 0)), revolution_arc=F17_T48_ANGLE, mode=Mode.SUBTRACT)

    # F17_s49 → F17_t50 (revolve, cut)
    with BuildSketch(Plane.XY.offset(12.8774151417)):
        with BuildLine():
            ThreePointArc((149.1701249525, 0), (150.9045454422, -0.7184204897), (151.6229659319, -2.4528409794))
            Line((151.6229659319, -2.4528409794), (151.6229659319, 0))
            Line((151.6229659319, 0), (149.1701249525, 0))
        make_face()
    revolve(axis=Axis((138.7455507902, 0, 12.8774151417), (0, 1, 0)), revolution_arc=F17_T50_ANGLE, mode=Mode.SUBTRACT)

    # F17_s51 → F17_t52 (revolve, cut)
    with BuildSketch(Plane.XY.offset(12.8774151417)):
        with BuildLine():
            ThreePointArc((149.1701249525, -5.588), (150.9045454422, -4.8695795103), (151.6229659319, -3.1351590206))
            Line((151.6229659319, -3.1351590206), (151.6229659319, -5.588))
            Line((151.6229659319, -5.588), (149.1701249525, -5.588))
        make_face()
    revolve(axis=Axis((138.7455507902, -5.588, 12.8774151417), (0, 1, 0)), revolution_arc=F17_T52_ANGLE, mode=Mode.SUBTRACT)

    # F20 (on offset) → F21 (join)
    with BuildSketch(Plane.XY.offset(6.096)):
        Polygon((21.6764695942, -1.2347314041), (23.9960364997, -4.4464389794), (32.8282304108, -9.7100706771), (38.6150412891, 0), (36.4860072732, 2.8691168409), align=None)
    extrude(amount=F21_DEPTH)

    # F22 (on offset) → F23 (join)
    with BuildSketch(Plane.XY.offset(18.542)):
        Polygon((21.7032115906, -1.1815896723), (24.0227784961, -4.3932972476), (32.8549724072, -9.6569289453), (38.6417832855, 0.0531417318), (36.5127492696, 2.9222585727), align=None)
    extrude(amount=-F23_DEPTH)

    # F24
    f24_edges = [f1_8.edges().sort_by_distance(p)[0] for p in [
        (31.496, -3.687096, 12.446),
        (31.496, -3.687096, 4.338484),
        (31.496, -3.687096, 20.270839),
    ]]
    fillet(f24_edges, radius=F24_R)


solid = f1_8.part
